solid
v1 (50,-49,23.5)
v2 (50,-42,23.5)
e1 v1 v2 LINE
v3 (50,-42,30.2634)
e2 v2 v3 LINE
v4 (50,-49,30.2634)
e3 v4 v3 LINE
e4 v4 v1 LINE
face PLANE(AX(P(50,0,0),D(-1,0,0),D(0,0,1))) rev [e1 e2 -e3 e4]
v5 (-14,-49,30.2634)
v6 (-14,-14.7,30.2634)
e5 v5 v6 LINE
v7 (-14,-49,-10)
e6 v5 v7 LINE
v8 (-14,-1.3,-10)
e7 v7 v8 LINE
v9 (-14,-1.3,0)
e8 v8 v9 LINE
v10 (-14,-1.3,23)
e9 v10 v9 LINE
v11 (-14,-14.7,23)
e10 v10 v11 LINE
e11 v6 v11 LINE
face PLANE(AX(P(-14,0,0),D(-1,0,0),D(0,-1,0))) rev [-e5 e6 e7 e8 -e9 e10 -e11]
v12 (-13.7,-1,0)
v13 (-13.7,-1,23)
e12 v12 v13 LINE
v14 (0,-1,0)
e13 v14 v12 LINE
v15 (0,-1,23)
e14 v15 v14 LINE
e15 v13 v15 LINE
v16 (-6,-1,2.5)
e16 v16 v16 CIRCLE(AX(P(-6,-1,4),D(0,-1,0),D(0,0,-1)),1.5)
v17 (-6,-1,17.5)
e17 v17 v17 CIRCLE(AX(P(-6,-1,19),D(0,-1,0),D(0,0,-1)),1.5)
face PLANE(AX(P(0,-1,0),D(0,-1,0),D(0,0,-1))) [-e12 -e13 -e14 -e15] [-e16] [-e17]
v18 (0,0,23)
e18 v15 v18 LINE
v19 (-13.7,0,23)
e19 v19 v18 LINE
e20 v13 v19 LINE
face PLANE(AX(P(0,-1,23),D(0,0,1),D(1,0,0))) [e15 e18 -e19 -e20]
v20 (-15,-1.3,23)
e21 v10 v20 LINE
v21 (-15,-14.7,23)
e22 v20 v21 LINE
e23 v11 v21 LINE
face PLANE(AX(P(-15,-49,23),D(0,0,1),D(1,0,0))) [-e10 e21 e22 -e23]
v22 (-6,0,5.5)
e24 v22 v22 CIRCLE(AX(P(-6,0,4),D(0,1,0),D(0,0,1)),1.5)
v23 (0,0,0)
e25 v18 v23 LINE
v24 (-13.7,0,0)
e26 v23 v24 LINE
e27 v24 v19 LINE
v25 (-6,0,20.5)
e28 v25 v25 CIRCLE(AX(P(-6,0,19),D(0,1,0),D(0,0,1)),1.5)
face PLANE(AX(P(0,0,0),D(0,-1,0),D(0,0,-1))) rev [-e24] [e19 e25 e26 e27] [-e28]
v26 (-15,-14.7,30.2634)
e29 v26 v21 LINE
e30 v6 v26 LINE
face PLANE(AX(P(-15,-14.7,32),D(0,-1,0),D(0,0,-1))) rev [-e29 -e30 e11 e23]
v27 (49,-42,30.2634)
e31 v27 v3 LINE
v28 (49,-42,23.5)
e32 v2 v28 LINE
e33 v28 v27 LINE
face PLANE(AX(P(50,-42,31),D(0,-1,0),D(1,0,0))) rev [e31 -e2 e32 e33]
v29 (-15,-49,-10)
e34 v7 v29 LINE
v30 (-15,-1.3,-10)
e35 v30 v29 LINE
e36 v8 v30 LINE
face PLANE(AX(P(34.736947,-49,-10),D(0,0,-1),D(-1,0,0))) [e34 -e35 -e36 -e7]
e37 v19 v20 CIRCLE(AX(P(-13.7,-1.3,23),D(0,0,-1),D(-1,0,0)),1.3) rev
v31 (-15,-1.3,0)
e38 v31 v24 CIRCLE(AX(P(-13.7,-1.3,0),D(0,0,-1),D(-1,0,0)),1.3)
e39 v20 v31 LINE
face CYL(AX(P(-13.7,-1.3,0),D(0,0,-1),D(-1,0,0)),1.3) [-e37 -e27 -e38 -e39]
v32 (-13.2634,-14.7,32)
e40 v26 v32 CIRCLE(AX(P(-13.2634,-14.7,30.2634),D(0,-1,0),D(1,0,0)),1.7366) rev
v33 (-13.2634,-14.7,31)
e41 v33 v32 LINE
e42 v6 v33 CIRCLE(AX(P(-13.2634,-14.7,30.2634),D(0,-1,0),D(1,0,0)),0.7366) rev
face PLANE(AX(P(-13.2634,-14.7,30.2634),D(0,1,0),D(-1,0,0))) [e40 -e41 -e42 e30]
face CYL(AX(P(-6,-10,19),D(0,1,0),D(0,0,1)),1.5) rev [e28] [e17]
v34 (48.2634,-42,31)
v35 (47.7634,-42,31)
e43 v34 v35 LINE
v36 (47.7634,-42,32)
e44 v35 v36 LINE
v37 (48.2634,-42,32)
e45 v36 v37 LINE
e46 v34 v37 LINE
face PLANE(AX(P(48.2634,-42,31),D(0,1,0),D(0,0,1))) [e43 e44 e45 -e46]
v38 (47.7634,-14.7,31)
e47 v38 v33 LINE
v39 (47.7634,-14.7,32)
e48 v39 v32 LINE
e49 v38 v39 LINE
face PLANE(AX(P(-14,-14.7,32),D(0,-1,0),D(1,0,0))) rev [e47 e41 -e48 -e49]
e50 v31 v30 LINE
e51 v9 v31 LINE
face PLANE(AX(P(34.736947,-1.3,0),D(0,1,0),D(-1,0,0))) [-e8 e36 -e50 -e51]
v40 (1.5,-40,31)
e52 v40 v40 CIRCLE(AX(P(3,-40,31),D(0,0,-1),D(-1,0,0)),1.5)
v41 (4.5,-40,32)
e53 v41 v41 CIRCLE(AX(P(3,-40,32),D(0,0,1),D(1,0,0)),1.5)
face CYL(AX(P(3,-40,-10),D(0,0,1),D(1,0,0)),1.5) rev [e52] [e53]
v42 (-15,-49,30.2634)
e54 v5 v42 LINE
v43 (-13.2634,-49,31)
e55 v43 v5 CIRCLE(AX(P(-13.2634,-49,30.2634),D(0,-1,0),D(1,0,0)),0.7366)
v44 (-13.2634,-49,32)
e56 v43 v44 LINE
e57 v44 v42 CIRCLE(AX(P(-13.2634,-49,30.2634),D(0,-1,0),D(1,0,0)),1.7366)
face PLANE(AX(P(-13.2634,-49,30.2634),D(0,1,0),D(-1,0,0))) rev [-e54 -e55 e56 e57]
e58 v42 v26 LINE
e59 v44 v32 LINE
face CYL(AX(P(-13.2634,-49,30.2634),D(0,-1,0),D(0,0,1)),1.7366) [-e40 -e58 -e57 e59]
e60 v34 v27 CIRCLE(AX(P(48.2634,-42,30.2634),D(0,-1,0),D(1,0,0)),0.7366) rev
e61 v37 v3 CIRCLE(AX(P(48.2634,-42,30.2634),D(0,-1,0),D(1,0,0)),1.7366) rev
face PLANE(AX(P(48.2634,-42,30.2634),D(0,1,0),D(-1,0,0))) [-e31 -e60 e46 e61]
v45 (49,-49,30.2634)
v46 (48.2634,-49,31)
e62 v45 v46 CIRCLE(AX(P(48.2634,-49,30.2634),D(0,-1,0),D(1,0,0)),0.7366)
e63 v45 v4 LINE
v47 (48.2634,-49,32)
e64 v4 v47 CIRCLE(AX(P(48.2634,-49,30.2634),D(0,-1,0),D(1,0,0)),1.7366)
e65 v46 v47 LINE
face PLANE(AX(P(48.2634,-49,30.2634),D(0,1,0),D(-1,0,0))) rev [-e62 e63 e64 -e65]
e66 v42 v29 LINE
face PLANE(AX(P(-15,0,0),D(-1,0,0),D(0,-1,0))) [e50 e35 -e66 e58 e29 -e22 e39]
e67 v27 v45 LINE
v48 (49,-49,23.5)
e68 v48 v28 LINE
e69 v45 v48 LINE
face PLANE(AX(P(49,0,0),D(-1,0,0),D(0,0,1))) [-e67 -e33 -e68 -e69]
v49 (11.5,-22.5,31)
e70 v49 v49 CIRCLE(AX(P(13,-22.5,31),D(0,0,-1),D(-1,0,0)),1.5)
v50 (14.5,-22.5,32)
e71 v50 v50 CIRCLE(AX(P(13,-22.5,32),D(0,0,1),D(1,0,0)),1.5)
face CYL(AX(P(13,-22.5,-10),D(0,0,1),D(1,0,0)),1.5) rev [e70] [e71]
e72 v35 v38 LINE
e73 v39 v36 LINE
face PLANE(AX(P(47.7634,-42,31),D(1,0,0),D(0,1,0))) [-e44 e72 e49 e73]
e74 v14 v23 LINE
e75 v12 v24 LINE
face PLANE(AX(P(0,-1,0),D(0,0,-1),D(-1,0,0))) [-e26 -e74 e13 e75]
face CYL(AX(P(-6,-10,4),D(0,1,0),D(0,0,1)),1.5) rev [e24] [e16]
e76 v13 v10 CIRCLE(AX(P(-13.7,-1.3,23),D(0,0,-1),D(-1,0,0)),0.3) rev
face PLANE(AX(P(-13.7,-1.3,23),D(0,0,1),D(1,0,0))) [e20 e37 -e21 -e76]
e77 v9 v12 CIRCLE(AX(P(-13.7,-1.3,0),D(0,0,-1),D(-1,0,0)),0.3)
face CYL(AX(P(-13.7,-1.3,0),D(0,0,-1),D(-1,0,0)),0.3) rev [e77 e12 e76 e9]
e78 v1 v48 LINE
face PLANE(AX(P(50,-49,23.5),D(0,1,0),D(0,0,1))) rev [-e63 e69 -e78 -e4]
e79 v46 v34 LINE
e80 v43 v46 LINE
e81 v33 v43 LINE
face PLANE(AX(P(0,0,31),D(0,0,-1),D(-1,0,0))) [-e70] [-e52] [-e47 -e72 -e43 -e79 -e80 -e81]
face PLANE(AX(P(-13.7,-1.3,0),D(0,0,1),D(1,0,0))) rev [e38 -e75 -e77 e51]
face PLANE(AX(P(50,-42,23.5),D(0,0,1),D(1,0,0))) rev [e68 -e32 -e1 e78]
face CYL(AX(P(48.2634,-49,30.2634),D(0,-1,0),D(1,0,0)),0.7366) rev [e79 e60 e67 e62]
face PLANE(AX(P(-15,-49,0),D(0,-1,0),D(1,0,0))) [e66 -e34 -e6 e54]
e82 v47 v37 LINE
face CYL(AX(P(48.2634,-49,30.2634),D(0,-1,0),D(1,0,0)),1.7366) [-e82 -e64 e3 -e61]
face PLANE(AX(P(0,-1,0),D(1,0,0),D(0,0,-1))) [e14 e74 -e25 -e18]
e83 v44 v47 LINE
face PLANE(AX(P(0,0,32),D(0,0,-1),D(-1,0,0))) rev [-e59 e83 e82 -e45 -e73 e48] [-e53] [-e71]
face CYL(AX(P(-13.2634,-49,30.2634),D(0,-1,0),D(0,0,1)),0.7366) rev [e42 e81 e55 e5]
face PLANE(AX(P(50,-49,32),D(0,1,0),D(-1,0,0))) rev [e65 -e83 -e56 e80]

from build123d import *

# Parameters (mm, degrees)
SKETCH1_W                     = 15
SKETCH1_H                     = 23
BASE_FLANGE1_DEPTH            = 1
EDGE_FLANGE1_STRIP_W          = 4.6
EDGE_FLANGE1_STRIP_H          = 1
EDGE_FLANGE1_STRIP_CUT_DEPTH  = 23
EDGE_FLANGE1_DEPTH            = 23
SKETCH10_W                    = 10
SKETCH10_H                    = 47.7
BOSS_EXTRUDE2_DEPTH           = 1
SKETCH15_W                    = 1
SKETCH15_H                    = 34.3
BOSS_EXTRUDE3_DEPTH           = 9
EDGE_FLANGE3_STRIP_W          = 5.4732
EDGE_FLANGE3_STRIP_H          = 1
EDGE_FLANGE3_STRIP_CUT_DEPTH  = 34.3
EDGE_FLANGE3_DEPTH            = 34.3
EDGE_FLANGE4_STRIP_W          = 5.4732
EDGE_FLANGE4_STRIP_H          = 1
EDGE_FLANGE4_STRIP_CUT_DEPTH  = 7
EDGE_FLANGE4_RELIEF_W         = 5.9732
EDGE_FLANGE4_RELIEF_H         = 1000
EDGE_FLANGE4_RELIEF_CUT_DEPTH = 1
EDGE_FLANGE4_DEPTH            = 7
SKETCH31_R                    = 1.5
CUT_EXTRUDE1_DEPTH            = 82.639451248
SKETCH32_R                    = 1.5
CUT_EXTRUDE2_DEPTH            = 10


# Sheet-metal steps are written as plain solids
with BuildPart() as part:
    # Sketch1 → Base-Flange1 (new body)
    with BuildSketch(Plane(origin=(0, 0, 0), x_dir=(1, 0, 0), z_dir=(0, 1, 0))):
        with Locations((-7.5, -11.5)):
            Rectangle(SKETCH1_W, SKETCH1_H)
    extrude(amount=-BASE_FLANGE1_DEPTH)

    # Edge-Flange1 strip (across the edge) → Edge-Flange1 strip cut (cut)
    with BuildSketch(Plane(origin=(-15, -1, 23), x_dir=(1, 0, 0), z_dir=(0, 0, -1))):
        with Locations((-1, -0.5)):
            Rectangle(EDGE_FLANGE1_STRIP_W, EDGE_FLANGE1_STRIP_H)
    extrude(amount=EDGE_FLANGE1_STRIP_CUT_DEPTH, mode=Mode.SUBTRACT)

    # Edge-Flange1 section (across the edge) → Edge-Flange1 (add)
    with BuildSketch(Plane(origin=(-15, -1, 23), x_dir=(1, 0, 0), z_dir=(0, 0, -1))):
        with BuildLine():
            Line((0, 0.3), (0, 48))
            Line((0, 48), (1, 48))
            Line((1, 48), (1, 0.3))
            ThreePointArc((1, 0.3), (1.087867966, 0.087867966), (1.3, 0))
            Line((1.3, 0), (1.3, -1))
            ThreePointArc((1.3, -1), (0.380761184, -0.619238816), (0, 0.3))
        make_face()
    extrude(amount=EDGE_FLANGE1_DEPTH)

    # Sketch10 → Boss-Extrude2 (add)
    with BuildSketch(Plane.ZY.offset(15)):
        with Locations((-5, -25.15)):
            Rectangle(SKETCH10_W, SKETCH10_H)
    extrude(amount=-BOSS_EXTRUDE2_DEPTH)

    # Sketch15 → Boss-Extrude3 (add)
    with BuildSketch(Plane.XY.offset(23)):
        with Locations((-14.5, -31.85)):
            Rectangle(SKETCH15_W, SKETCH15_H)
    extrude(amount=BOSS_EXTRUDE3_DEPTH)

    # Edge-Flange3 strip (across the edge) → Edge-Flange3 strip cut (cut)
    with BuildSketch(Plane(origin=(-14, -14.7, 32), x_dir=(0, 0, -1), z_dir=(0, -1, 0))):
        with Locations((-1, -0.5)):
            Rectangle(EDGE_FLANGE3_STRIP_W, EDGE_FLANGE3_STRIP_H)
    extrude(amount=EDGE_FLANGE3_STRIP_CUT_DEPTH, mode=Mode.SUBTRACT)

    # Edge-Flange3 section (across the edge) → Edge-Flange3 (add)
    with BuildSketch(Plane(origin=(-14, -14.7, 32), x_dir=(0, 0, -1), z_dir=(0, -1, 0))):
        with BuildLine():
            Line((0, 0.7366), (0, 64))
            Line((0, 64), (1, 64))
            Line((1, 64), (1, 0.7366))
            ThreePointArc((1, 0.7366), (1.215745145, 0.215745145), (1.7366, 0))
            Line((1.7366, 0), (1.7366, -1))
            ThreePointArc((1.7366, -1), (0.508638364, -0.491361636), (0, 0.7366))
        make_face()
    extrude(amount=EDGE_FLANGE3_DEPTH)

    # Edge-Flange4 strip (across the edge) → Edge-Flange4 strip cut (cut)
    with BuildSketch(Plane(origin=(50, -42, 31), x_dir=(-1, 0, 0), z_dir=(0, -1, 0))):
        with Locations((-1, -0.5)):
            Rectangle(EDGE_FLANGE4_STRIP_W, EDGE_FLANGE4_STRIP_H)
    extrude(amount=EDGE_FLANGE4_STRIP_CUT_DEPTH, mode=Mode.SUBTRACT)

    # Edge-Flange4 relief (on the sheet) → Edge-Flange4 relief cut (cut)
    with BuildSketch(Plane(origin=(48.2634, -42, 31), x_dir=(-1, 0, 0), z_dir=(0, 0, -1))):
        with Locations((-2.4866, 500)):
            Rectangle(EDGE_FLANGE4_RELIEF_W, EDGE_FLANGE4_RELIEF_H)
    extrude(amount=-EDGE_FLANGE4_RELIEF_CUT_DEPTH, mode=Mode.SUBTRACT)

    # Edge-Flange4 section (across the edge) → Edge-Flange4 (add)
    with BuildSketch(Plane(origin=(50, -42, 31), x_dir=(-1, 0, 0), z_dir=(0, -1, 0))):
        with BuildLine():
            Line((0, 0.7366), (0, 7.5))
            Line((0, 7.5), (1, 7.5))
            Line((1, 7.5), (1, 0.7366))
            ThreePointArc((1, 0.7366), (1.215745145, 0.215745145), (1.7366, 0))
            Line((1.7366, 0), (1.7366, -1))
            ThreePointArc((1.7366, -1), (0.508638364, -0.491361636), (0, 0.7366))
        make_face()
    extrude(amount=EDGE_FLANGE4_DEPTH)

    # Sketch31 → Cut-Extrude1 (cut, through all)
    with BuildSketch(Plane.XY.offset(32)):
        with Locations((3, -40)):
            Circle(SKETCH31_R)
        with Locations((13, -22.5)):
            Circle(SKETCH31_R)
    extrude(amount=-CUT_EXTRUDE1_DEPTH, mode=Mode.SUBTRACT)

    # Sketch32 → Cut-Extrude2 (cut)
    with BuildSketch(Plane(origin=(0, 0, 0), x_dir=(1, 0, 0), z_dir=(0, 1, 0))):
        with Locations(Location((-6, -4, 0), (0, 0, 270))):
            Circle(SKETCH32_R)
        with Locations(Location((-6, -19, 0), (0, 0, 270))):
            Circle(SKETCH32_R)
    extrude(amount=-CUT_EXTRUDE2_DEPTH, mode=Mode.SUBTRACT)


solid = part.part
